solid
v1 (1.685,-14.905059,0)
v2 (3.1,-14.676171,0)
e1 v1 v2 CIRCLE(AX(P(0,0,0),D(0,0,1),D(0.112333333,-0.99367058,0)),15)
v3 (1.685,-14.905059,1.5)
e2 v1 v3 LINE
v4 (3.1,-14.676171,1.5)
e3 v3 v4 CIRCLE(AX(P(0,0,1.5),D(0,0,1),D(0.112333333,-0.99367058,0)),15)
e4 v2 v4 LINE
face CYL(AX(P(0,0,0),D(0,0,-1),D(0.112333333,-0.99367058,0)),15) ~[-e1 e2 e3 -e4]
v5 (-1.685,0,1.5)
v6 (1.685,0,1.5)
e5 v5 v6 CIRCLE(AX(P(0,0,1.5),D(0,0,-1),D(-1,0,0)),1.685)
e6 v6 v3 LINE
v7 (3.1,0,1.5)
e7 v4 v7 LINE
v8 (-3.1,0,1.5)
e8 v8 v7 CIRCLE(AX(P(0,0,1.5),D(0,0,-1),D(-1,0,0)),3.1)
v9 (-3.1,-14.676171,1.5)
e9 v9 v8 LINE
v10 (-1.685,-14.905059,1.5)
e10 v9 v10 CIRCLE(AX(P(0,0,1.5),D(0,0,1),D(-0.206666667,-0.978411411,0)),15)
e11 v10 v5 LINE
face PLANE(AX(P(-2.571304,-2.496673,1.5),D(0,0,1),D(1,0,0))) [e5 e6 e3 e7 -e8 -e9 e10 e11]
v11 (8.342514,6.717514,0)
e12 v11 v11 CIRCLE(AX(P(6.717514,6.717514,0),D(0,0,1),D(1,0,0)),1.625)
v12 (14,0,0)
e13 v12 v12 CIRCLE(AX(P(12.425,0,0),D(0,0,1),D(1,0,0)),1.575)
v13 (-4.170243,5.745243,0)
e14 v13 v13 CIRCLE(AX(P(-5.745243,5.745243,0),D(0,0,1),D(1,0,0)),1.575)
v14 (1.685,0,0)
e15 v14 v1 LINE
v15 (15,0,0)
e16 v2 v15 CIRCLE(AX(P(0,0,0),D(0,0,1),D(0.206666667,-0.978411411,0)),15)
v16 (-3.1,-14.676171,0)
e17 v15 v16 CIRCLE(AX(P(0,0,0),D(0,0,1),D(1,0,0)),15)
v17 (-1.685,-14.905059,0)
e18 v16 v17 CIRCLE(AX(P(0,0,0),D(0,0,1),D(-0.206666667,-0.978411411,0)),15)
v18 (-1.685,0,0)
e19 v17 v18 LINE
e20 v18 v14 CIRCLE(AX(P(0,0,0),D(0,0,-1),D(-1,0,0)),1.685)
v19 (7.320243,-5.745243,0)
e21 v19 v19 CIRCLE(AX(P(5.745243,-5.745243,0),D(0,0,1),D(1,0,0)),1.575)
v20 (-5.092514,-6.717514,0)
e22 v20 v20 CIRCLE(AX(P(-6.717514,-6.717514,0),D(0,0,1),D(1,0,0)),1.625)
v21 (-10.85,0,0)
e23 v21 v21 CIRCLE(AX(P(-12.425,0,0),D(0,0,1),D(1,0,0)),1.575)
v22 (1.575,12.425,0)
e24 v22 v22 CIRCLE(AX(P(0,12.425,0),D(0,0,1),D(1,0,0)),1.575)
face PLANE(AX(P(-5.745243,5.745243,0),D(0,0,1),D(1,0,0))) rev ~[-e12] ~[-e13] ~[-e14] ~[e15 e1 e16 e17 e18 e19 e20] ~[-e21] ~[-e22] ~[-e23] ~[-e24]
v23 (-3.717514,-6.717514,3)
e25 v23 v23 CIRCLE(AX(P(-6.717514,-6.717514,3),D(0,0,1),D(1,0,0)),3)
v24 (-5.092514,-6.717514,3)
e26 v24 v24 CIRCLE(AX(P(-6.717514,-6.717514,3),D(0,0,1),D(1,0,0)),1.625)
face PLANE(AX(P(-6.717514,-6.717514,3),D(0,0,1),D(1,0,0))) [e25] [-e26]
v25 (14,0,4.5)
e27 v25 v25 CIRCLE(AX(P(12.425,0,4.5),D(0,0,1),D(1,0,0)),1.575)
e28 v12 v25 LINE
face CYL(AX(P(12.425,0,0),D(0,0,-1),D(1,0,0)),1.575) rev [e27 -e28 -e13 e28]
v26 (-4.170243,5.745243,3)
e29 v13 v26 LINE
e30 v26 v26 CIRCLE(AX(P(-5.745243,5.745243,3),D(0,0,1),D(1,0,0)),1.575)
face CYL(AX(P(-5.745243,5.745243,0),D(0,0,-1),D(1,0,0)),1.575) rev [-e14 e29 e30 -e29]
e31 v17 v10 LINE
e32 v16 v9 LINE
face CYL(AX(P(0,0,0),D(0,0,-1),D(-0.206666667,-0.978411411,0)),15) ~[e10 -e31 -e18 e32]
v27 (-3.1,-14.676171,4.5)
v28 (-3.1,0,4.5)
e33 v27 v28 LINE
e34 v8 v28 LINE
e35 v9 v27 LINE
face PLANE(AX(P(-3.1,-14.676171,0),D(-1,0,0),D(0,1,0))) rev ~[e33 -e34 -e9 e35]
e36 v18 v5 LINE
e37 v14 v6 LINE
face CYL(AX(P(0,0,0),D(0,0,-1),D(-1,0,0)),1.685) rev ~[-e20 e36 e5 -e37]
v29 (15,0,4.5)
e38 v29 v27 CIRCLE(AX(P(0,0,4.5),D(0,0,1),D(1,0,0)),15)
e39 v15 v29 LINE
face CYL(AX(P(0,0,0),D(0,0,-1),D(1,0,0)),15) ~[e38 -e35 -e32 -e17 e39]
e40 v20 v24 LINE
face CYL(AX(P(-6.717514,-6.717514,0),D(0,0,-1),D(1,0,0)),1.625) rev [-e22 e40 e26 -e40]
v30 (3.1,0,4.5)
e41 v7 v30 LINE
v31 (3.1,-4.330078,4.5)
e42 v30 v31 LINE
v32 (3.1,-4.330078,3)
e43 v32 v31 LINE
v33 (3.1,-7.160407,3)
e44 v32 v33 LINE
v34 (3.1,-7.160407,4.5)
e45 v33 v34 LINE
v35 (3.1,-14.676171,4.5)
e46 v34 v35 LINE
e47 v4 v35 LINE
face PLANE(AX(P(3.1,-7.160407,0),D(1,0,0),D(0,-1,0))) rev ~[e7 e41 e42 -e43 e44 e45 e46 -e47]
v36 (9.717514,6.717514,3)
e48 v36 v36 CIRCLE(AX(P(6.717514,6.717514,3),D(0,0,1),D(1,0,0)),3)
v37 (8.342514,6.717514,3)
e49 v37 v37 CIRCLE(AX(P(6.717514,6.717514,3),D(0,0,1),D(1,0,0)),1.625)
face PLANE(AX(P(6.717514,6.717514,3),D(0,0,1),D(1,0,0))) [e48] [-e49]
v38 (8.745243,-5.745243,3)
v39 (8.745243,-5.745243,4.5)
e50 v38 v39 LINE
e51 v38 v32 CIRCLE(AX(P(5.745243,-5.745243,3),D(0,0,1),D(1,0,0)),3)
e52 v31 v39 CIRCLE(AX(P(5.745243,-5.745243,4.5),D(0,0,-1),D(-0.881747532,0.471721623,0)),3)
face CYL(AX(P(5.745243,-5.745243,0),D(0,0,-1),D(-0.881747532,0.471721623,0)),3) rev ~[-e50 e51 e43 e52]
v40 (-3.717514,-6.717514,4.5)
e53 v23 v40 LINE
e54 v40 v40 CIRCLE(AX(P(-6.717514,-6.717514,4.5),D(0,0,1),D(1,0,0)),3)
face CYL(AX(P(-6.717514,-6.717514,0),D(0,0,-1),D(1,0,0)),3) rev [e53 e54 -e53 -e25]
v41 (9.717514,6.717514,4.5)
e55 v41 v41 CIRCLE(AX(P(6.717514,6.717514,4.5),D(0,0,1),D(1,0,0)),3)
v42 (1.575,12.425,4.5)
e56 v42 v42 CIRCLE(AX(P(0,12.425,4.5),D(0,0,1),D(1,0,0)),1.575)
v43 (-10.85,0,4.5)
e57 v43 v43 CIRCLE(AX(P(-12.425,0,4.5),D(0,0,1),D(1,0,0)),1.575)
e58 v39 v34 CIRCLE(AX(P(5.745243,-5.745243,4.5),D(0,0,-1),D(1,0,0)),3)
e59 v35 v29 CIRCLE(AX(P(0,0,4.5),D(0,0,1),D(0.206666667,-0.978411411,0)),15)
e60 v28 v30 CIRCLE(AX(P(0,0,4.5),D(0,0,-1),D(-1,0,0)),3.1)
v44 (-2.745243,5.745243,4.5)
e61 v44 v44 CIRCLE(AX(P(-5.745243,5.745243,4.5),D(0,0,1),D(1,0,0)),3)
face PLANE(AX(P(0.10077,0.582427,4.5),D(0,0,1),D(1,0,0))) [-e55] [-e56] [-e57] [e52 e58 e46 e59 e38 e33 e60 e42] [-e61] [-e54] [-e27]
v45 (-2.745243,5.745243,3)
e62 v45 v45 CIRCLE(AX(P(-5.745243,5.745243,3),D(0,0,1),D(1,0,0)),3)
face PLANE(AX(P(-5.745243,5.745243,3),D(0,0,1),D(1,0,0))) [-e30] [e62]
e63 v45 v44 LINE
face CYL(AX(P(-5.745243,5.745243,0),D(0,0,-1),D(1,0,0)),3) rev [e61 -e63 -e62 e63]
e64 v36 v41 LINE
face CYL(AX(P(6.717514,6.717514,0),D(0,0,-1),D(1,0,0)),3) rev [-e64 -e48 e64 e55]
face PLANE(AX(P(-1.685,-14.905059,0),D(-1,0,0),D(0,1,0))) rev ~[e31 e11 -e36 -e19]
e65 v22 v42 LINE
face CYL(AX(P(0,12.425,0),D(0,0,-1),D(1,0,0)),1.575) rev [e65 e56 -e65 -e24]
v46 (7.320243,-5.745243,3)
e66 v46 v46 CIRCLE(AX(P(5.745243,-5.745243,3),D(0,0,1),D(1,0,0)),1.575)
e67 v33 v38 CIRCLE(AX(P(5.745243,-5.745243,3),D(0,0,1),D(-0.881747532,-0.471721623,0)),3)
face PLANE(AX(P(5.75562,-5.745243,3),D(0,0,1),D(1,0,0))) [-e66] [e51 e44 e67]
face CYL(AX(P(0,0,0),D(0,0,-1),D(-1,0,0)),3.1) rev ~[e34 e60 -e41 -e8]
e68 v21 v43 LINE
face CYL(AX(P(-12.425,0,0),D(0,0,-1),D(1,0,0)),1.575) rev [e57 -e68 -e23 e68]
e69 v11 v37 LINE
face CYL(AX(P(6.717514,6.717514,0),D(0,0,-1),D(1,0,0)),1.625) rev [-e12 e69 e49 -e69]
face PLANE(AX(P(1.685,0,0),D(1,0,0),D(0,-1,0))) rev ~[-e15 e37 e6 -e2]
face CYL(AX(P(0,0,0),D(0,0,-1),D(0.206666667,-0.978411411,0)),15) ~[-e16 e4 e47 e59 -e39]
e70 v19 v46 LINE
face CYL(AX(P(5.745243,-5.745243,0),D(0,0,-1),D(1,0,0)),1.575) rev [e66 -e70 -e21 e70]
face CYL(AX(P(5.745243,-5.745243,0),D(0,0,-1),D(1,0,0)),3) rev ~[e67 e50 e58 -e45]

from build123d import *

# Parameters (mm, degrees)
F1_DEPTH = 1.5
F0_R     = 3
F0_R_2   = 1.575
F2_DEPTH = 4.5
F0_R_3   = 1.625
F3_DEPTH = 3


# Not quite as in the source:
# - a feature names something its author has since deleted; it is built from what else it names


with BuildPart() as f1:
    # F0 (on Top) → F1 (new body)
    with BuildSketch(Plane.XY):
        with BuildLine():
            Line((-1.685, -4.7075232341), (-1.685, -2.6020712903))
            ThreePointArc((-1.685, -2.6020712903), (-2.7233710728, -1.4809625248), (-3.1, 0))
            Line((-3.1, 0), (-3.1, -3.9230090492))
            ThreePointArc((-3.1, -3.9230090492), (-2.4244425909, -4.3728798432), (-1.685, -4.7075232341))
        make_face()
        with BuildLine():
            Line((-1.685, -14.905058705), (-1.685, -4.7075232341))
            ThreePointArc((-1.685, -4.7075232341), (-2.4244425909, -4.3728798432), (-3.1, -3.9230090492))
            Line((-3.1, -3.9230090492), (-3.1, -14.6761711628))
            ThreePointArc((-3.1, -14.6761711628), (-2.3952356099, -14.8075266798), (-1.685, -14.905058705))
        make_face()
        with BuildLine():
            ThreePointArc((3.1, -3.9230090492), (2.4244425909, -4.3728798432), (1.685, -4.7075232341))
            Line((1.685, -4.7075232341), (1.685, -14.905058705))
            ThreePointArc((1.685, -14.905058705), (2.3952356099, -14.8075266798), (3.1, -14.6761711628))
            Line((3.1, -14.6761711628), (3.1, -7.1604074647))
            ThreePointArc((3.1, -7.1604074647), (2.7452425971, -5.7452425971), (3.1, -4.3300777296))
            Line((3.1, -4.3300777296), (3.1, -3.9230090492))
        make_face()
        with BuildLine():
            ThreePointArc((-1.685, 0), (0, 1.685), (1.685, 0))
            Line((1.685, 0), (1.685, -2.6020712903))
            ThreePointArc((1.685, -2.6020712903), (2.7233710728, -1.4809625248), (3.1, 0))
            ThreePointArc((3.1, 0), (0, 3.1), (-3.1, 0))
            ThreePointArc((-3.1, 0), (-2.7233710728, -1.4809625248), (-1.685, -2.6020712903))
            Line((-1.685, -2.6020712903), (-1.685, 0))
        make_face()
        with BuildLine():
            ThreePointArc((-3.1, 0), (0, 3.1), (3.1, 0))
            Line((3.1, 0), (3.1, -3.9230090492))
            ThreePointArc((3.1, -3.9230090492), (4.5, -2.1794494718), (5, 0))
            ThreePointArc((5, 0), (-2.1794494718, 4.5), (-3.1, -3.9230090492))
            Line((-3.1, -3.9230090492), (-3.1, 0))
        make_face()
        with BuildLine():
            ThreePointArc((3.1, 0), (2.7233710728, -1.4809625248), (1.685, -2.6020712903))
            Line((1.685, -2.6020712903), (1.685, -4.7075232341))
            ThreePointArc((1.685, -4.7075232341), (2.4244425909, -4.3728798432), (3.1, -3.9230090492))
            Line((3.1, -3.9230090492), (3.1, 0))
        make_face()
        with BuildLine():
            Line((3.1, -7.1604074647), (3.1, -4.3300777296))
            ThreePointArc((3.1, -4.3300777296), (2.7452425971, -5.7452425971), (3.1, -7.1604074647))
        make_face()
    extrude(amount=F1_DEPTH)

    # F0 (on Top) → F2 (join)
    with BuildSketch(Plane.XY):
        with BuildLine():
            ThreePointArc((-3.1, 0), (0, 3.1), (3.1, 0))
            Line((3.1, 0), (3.1, -3.9230090492))
            ThreePointArc((3.1, -3.9230090492), (4.5, -2.1794494718), (5, 0))
            ThreePointArc((5, 0), (-2.1794494718, 4.5), (-3.1, -3.9230090492))
            Line((-3.1, -3.9230090492), (-3.1, 0))
        make_face()
        with BuildLine():
            ThreePointArc((5, 0), (4.5, -2.1794494718), (3.1, -3.9230090492))
            Line((3.1, -3.9230090492), (3.1, -4.3300777296))
            ThreePointArc((3.1, -4.3300777296), (6.4747191933, -2.8352831652), (8.7452425971, -5.7452425971))
            ThreePointArc((8.7452425971, -5.7452425971), (6.4747191933, -8.6552020291), (3.1, -7.1604074647))
            Line((3.1, -7.1604074647), (3.1, -14.6761711628))
            ThreePointArc((3.1, -14.6761711628), (11.6511801977, -9.4472218138), (15, 0))
            ThreePointArc((15, 0), (-9.4472218138, 11.6511801977), (-3.1, -14.6761711628))
            Line((-3.1, -14.6761711628), (-3.1, -3.9230090492))
            ThreePointArc((-3.1, -3.9230090492), (-2.1794494718, 4.5), (5, 0))
        make_face()
        with Locations((-6.7175144213, -6.7175144213)):
            Circle(F0_R, mode=Mode.SUBTRACT)
        with Locations((-12.425, 0)):
            Circle(F0_R_2, mode=Mode.SUBTRACT)
        with Locations((-5.7452425971, 5.7452425971)):
            Circle(F0_R, mode=Mode.SUBTRACT)
        with Locations((6.7175144213, 6.7175144213)):
            Circle(F0_R, mode=Mode.SUBTRACT)
        with Locations((12.425, 0)):
            Circle(F0_R_2, mode=Mode.SUBTRACT)
        with Locations((0, 12.425)):
            Circle(F0_R_2, mode=Mode.SUBTRACT)
    extrude(amount=F2_DEPTH)

    # F0 (on Top) → F3 (join)
    with BuildSketch(Plane.XY):
        with Locations((-5.7452425971, 5.7452425971)):
            Circle(F0_R)
        with Locations((-5.7452425971, 5.7452425971)):
            Circle(F0_R_2, mode=Mode.SUBTRACT)
        with Locations((6.7175144213, 6.7175144213)):
            Circle(F0_R)
        with Locations((6.7175144213, 6.7175144213)):
            Circle(F0_R_3, mode=Mode.SUBTRACT)
        with BuildLine():
            ThreePointArc((8.7452425971, -5.7452425971), (6.4747191933, -2.8352831652), (3.1, -4.3300777296))
            Line((3.1, -4.3300777296), (3.1, -7.1604074647))
            ThreePointArc((3.1, -7.1604074647), (6.4747191933, -8.6552020291), (8.7452425971, -5.7452425971))
        make_face()
        with Locations((5.7452425971, -5.7452425971)):
            Circle(F0_R_2, mode=Mode.SUBTRACT)
        with Locations((-6.7175144213, -6.7175144213)):
            Circle(F0_R)
        with Locations((-6.7175144213, -6.7175144213)):
            Circle(F0_R_3, mode=Mode.SUBTRACT)
    extrude(amount=F3_DEPTH)


solid = f1.part
